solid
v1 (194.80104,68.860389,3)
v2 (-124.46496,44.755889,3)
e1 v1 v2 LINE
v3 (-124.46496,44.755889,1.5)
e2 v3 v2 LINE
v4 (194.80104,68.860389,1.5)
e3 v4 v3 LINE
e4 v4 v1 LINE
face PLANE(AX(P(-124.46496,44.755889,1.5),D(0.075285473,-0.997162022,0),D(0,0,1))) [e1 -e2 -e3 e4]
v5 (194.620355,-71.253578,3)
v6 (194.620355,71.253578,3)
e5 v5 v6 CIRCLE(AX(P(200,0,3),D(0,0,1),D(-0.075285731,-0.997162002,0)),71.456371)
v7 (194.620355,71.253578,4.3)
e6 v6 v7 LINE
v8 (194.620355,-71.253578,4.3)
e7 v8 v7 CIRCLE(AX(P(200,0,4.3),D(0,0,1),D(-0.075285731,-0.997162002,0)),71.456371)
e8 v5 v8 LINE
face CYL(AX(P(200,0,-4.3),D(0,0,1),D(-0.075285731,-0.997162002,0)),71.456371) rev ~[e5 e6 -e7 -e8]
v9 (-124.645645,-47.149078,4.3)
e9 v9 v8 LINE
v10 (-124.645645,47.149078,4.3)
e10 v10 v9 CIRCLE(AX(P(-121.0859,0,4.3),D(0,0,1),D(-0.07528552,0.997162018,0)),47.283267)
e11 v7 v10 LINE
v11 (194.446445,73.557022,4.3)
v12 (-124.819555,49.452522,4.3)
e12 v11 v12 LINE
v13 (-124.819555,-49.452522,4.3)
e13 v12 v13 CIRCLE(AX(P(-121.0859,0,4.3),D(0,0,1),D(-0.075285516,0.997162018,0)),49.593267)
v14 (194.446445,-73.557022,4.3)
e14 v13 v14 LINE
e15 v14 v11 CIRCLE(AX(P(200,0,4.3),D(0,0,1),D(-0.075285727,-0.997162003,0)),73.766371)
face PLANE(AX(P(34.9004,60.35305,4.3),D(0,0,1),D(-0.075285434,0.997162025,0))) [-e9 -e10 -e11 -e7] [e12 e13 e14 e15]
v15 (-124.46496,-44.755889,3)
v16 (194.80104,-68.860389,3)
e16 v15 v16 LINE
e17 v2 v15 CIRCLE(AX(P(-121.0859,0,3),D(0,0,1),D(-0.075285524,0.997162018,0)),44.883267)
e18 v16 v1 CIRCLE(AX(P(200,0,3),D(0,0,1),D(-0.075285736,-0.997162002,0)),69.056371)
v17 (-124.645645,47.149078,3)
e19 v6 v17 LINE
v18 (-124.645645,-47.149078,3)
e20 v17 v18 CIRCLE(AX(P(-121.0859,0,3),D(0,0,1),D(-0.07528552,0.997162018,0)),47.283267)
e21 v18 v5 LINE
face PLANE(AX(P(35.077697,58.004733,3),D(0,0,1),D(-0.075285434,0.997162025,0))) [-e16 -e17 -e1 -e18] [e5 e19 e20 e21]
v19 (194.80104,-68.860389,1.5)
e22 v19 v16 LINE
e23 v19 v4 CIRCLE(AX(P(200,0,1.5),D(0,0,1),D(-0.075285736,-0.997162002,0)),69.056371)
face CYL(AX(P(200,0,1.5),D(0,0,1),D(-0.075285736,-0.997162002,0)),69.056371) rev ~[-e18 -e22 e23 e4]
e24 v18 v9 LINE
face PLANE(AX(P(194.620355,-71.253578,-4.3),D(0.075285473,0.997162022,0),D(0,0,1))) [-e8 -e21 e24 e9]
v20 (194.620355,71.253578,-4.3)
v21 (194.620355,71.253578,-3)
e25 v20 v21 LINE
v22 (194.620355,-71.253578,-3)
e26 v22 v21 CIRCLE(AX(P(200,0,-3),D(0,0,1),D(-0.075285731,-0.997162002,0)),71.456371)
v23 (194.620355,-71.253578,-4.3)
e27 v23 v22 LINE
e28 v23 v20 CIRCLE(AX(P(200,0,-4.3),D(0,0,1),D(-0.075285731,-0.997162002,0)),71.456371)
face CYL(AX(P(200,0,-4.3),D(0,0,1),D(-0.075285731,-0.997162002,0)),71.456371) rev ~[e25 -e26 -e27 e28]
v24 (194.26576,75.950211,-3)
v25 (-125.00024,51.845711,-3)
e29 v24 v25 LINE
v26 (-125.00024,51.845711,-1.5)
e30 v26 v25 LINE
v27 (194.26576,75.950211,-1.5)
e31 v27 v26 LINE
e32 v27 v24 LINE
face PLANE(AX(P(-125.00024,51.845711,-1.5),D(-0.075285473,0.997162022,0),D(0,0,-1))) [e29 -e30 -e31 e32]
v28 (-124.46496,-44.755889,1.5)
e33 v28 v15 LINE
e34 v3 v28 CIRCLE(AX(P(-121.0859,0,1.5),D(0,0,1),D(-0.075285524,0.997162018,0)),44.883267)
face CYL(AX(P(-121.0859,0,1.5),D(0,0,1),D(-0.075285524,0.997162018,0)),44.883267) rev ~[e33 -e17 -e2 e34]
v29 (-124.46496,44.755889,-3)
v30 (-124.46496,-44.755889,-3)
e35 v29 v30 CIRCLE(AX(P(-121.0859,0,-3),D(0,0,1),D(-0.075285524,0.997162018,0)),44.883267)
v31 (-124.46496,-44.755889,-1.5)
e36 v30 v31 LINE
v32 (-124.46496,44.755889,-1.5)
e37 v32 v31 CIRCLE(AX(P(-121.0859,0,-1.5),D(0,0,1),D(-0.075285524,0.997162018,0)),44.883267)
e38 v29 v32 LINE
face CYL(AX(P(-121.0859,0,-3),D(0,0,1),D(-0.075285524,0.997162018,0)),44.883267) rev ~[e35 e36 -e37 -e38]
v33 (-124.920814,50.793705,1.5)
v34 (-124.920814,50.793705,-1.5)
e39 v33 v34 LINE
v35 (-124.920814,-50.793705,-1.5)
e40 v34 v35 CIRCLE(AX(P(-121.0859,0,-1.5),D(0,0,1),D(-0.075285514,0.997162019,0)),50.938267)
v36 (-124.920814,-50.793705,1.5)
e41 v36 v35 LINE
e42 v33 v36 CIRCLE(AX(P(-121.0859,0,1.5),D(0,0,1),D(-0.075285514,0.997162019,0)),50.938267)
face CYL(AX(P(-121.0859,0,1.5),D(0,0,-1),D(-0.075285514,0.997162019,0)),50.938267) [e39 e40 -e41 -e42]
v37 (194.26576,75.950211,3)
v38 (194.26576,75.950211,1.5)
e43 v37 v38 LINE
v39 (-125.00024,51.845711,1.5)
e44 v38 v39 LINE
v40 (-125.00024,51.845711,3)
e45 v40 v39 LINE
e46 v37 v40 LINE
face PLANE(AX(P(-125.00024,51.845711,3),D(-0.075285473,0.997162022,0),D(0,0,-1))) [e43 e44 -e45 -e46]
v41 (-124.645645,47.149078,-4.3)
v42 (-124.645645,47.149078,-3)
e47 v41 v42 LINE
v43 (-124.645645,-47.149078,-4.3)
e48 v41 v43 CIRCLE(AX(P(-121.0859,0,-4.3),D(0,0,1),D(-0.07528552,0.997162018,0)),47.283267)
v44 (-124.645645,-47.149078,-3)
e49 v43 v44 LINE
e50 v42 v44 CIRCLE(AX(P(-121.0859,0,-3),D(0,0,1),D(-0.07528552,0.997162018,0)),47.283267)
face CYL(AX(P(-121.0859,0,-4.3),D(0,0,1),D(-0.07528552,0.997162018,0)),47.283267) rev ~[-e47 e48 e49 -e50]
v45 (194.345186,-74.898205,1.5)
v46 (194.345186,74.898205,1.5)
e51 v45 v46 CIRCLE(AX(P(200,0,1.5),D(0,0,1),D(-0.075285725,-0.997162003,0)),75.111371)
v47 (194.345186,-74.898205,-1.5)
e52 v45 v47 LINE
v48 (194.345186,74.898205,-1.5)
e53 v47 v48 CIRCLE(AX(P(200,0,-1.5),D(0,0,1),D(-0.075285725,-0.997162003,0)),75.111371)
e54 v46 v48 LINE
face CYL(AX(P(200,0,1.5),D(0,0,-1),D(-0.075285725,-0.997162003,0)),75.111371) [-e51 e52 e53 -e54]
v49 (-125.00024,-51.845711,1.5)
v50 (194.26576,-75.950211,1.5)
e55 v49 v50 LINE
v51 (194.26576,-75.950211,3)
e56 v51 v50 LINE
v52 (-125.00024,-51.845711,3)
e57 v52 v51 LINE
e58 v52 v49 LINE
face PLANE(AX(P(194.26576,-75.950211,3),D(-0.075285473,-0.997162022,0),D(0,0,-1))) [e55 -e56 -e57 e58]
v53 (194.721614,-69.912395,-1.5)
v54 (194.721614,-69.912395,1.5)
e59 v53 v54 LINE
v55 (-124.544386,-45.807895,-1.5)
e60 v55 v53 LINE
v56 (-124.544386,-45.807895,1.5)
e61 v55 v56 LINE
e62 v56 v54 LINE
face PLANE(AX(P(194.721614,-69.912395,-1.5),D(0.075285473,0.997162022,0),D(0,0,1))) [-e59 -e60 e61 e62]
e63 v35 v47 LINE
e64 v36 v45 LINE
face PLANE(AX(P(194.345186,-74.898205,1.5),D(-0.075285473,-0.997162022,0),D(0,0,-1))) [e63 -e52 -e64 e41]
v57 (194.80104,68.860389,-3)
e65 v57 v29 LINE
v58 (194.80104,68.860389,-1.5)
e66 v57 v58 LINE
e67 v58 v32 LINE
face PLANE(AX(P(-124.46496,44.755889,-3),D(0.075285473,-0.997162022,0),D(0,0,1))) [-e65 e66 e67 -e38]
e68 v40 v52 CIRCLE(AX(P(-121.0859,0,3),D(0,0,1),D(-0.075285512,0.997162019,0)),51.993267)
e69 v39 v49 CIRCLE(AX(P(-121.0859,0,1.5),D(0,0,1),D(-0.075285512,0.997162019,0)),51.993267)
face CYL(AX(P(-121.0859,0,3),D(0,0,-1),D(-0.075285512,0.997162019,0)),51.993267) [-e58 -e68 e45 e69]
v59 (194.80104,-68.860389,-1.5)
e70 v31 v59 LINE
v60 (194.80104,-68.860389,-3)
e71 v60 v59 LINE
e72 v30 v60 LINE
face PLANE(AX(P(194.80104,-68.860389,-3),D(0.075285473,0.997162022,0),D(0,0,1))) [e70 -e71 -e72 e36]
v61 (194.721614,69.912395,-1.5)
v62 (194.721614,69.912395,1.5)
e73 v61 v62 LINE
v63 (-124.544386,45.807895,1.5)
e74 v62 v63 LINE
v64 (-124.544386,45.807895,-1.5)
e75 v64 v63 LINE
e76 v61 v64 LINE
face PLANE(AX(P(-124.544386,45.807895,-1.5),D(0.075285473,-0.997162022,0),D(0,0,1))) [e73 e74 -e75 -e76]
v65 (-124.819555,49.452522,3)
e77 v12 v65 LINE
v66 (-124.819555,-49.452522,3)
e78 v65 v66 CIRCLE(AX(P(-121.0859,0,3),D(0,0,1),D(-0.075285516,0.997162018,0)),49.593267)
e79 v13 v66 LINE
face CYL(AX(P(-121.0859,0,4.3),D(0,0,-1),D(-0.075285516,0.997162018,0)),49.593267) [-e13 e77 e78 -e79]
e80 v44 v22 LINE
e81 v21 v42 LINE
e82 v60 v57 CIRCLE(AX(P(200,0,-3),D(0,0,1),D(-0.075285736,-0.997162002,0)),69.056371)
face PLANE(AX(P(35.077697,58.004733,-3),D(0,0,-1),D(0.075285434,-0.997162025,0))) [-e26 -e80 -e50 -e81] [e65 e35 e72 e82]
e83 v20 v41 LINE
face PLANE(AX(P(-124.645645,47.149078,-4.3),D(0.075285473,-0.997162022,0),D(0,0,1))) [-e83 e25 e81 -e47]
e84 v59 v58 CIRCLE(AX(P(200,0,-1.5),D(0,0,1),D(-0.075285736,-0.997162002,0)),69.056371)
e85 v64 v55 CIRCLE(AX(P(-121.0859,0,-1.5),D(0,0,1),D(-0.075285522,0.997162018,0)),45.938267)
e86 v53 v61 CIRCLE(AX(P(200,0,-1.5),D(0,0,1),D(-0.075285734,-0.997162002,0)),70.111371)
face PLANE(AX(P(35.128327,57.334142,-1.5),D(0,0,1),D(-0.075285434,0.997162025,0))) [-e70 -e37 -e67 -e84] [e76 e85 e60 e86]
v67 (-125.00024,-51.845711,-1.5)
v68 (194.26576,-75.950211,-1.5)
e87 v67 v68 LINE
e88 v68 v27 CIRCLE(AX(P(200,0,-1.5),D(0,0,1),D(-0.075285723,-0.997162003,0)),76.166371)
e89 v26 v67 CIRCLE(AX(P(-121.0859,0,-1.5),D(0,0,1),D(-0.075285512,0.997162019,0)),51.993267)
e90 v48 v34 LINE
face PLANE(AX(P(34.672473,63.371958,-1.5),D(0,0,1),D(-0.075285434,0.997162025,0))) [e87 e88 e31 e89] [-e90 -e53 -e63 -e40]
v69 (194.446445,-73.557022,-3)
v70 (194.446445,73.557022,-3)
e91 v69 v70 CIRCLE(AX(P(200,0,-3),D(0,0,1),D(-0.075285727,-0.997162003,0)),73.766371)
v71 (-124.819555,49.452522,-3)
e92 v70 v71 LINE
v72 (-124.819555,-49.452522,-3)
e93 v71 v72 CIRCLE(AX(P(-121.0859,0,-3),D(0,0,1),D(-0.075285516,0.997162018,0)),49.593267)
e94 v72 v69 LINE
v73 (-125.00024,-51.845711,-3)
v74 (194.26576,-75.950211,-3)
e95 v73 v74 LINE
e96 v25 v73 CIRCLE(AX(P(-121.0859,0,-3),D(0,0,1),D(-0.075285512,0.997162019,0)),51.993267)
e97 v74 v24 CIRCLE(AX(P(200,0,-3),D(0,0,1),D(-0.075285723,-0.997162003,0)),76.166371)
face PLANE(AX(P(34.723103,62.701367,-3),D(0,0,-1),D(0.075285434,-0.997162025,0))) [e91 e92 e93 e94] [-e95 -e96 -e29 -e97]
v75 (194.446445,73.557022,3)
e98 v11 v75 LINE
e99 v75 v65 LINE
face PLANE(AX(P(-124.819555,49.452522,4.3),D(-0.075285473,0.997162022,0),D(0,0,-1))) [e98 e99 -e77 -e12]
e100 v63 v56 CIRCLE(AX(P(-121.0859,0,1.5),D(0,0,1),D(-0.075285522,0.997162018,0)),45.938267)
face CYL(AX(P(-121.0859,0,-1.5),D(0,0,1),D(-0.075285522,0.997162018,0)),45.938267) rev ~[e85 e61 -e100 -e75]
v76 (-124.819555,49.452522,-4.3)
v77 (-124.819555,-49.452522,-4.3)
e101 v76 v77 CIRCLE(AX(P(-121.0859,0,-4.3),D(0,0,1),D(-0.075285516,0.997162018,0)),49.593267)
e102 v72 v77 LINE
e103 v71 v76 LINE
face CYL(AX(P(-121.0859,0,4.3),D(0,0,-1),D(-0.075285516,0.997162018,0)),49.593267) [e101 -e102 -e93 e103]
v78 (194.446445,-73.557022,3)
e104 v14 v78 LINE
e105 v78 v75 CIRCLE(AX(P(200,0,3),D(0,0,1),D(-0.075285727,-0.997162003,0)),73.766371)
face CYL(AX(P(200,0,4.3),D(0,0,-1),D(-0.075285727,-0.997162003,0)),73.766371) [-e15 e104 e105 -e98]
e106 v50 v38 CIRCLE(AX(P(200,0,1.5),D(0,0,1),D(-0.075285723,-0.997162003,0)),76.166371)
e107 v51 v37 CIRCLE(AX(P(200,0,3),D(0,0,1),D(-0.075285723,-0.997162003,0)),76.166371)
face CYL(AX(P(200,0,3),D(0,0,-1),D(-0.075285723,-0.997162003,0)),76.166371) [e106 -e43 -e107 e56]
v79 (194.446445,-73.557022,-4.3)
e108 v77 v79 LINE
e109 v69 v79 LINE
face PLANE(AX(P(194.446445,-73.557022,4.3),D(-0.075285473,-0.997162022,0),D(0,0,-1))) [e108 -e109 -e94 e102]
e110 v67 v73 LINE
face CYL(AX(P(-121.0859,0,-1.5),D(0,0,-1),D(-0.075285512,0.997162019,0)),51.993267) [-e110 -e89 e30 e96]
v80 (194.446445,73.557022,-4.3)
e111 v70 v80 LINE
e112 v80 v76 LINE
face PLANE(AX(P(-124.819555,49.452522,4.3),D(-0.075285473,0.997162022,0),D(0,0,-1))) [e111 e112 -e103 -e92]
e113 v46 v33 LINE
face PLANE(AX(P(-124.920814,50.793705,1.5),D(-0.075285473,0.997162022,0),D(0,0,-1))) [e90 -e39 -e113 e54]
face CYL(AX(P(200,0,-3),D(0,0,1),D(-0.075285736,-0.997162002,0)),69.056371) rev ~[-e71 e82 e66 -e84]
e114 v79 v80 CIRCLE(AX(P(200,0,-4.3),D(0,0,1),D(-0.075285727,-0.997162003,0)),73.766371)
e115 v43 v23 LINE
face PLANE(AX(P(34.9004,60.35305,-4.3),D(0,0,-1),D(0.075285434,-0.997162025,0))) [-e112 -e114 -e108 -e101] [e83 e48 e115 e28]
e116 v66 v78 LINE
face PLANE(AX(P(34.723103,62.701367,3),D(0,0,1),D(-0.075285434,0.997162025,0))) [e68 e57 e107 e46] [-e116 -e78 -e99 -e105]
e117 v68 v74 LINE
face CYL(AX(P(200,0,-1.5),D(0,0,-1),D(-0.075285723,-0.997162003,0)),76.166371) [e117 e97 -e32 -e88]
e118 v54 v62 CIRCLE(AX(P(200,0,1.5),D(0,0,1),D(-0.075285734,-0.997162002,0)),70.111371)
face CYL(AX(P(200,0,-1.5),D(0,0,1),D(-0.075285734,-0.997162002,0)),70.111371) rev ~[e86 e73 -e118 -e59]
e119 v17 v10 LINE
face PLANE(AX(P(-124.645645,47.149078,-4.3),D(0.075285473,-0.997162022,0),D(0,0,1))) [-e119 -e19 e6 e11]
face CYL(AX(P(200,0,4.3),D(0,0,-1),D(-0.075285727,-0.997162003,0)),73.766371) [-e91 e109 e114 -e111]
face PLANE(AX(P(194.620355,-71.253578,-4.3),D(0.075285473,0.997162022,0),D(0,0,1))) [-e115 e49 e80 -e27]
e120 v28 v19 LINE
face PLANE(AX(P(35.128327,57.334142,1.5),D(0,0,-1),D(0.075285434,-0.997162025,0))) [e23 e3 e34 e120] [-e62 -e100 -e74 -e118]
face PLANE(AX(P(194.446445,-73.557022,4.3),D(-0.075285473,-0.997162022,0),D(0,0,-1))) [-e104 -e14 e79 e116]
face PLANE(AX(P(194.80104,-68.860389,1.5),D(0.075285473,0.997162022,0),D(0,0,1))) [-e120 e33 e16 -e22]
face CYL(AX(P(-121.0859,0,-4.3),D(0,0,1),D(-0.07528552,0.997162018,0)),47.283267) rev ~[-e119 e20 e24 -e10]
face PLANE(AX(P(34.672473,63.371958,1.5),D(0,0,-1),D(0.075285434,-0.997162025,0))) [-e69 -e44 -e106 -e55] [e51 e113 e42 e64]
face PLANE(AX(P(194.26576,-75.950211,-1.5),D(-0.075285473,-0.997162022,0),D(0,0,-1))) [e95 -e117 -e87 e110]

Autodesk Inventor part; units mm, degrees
ref_plane "Work Plane2" through (-121.0859, 0, 0) normal (-1, 0, 0) x (0, 0, 1)
ref_plane "Work Plane3" through (200, 0, 0) normal (-0.9996203, -0.0275543, 0) x (0, 0, 1)
sketch "Path" plane through (0, 0, 0) normal (0, 0, 1) x (1, 0, 0)
  arc A0 (-124.7326, 48.3008) -> (-124.7326, -48.3008) centre (-121.0859, 0) ccw
  arc A1 (194.5334, -72.4053) -> (194.5334, 72.4053) centre (200, 0) ccw
  line L0 (194.5334, -72.4053) -> (-124.7326, -48.3008)
  line L1 (-124.7326, 48.3008) -> (194.5334, 72.4053)
ref_plane "Section Plane" through (-124.7326, -48.3008, 0) normal (0.997162, -0.0752856, 0) x (0, 0, 1)
sketch "Section Sketch" plane through (-124.7326, -48.3008, 0) normal (0.997162, -0.0752856, 0) x (0, 0, 1)
  line L0 (-4.3, -1.155) -> (4.3, -1.155)
  line L1 (4.3, -1.155) -> (4.3, 1.155)
  line L2 (4.3, 1.155) -> (-4.3, 1.155)
  line L3 (-4.3, 1.155) -> (-4.3, -1.155)
  line L4 (-1.5, -2.5) -> (1.5, -2.5)
  line L5 (1.5, -2.5) -> (1.5, 2.5)
  line L6 (1.5, 2.5) -> (-1.5, 2.5)
  line L7 (-1.5, 2.5) -> (-1.5, -2.5)
  line L8 (-1.5, 0) -> (1.5, 0) construction
  line L9 (-3, -3.555) -> (-1.5, -3.555)
  line L10 (-1.5, -3.555) -> (-1.5, 3.555)
  line L11 (-1.5, 3.555) -> (-3, 3.555)
  line L12 (-3, 3.555) -> (-3, -3.555)
  line L13 (1.5, -3.555) -> (3, -3.555)
  line L14 (3, -3.555) -> (3, 3.555)
  line L15 (3, 3.555) -> (1.5, 3.555)
  line L16 (1.5, 3.555) -> (1.5, -3.555)
  line L17 (-4.3, 0) -> (4.3, 0) construction
  point P0 (0, 0)
  point P1 (0, 0)
  dimension "d21" = 2.31
  dimension "d22" = 5
  dimension "d23" = 3
  dimension "d24" = 1.5
  dimension "d31" = 7.11
  dimension "d32" = 8.6
sweep "Solid" add profiles "Section Sketch" path "Path"
pattern_of_one "Strand Pattern"
equation "\"d21\" = da_d2"
equation "\"d22\" = da_d1"
equation "\"d23\" = da_b1"
equation "\"d24\" = da_t1 + da_t2"
equation "\"d30\" = da_pt"
equation "\"da_p\" = 8"
equation "\"da_b1\" = 3"
equation "\"da_h2\" = 7.11"
equation "\"da_h3\" = 7.11"
equation "\"da_d1\" = 5"
equation "\"da_d2\" = 2.31"
equation "\"da_pt\" = 5.64"
equation "\"da_b\" = 8.6"
equation "\"da_t1\" = 0.75"
equation "\"da_t2\" = 0.75"
properties part number "Roller Chain"
